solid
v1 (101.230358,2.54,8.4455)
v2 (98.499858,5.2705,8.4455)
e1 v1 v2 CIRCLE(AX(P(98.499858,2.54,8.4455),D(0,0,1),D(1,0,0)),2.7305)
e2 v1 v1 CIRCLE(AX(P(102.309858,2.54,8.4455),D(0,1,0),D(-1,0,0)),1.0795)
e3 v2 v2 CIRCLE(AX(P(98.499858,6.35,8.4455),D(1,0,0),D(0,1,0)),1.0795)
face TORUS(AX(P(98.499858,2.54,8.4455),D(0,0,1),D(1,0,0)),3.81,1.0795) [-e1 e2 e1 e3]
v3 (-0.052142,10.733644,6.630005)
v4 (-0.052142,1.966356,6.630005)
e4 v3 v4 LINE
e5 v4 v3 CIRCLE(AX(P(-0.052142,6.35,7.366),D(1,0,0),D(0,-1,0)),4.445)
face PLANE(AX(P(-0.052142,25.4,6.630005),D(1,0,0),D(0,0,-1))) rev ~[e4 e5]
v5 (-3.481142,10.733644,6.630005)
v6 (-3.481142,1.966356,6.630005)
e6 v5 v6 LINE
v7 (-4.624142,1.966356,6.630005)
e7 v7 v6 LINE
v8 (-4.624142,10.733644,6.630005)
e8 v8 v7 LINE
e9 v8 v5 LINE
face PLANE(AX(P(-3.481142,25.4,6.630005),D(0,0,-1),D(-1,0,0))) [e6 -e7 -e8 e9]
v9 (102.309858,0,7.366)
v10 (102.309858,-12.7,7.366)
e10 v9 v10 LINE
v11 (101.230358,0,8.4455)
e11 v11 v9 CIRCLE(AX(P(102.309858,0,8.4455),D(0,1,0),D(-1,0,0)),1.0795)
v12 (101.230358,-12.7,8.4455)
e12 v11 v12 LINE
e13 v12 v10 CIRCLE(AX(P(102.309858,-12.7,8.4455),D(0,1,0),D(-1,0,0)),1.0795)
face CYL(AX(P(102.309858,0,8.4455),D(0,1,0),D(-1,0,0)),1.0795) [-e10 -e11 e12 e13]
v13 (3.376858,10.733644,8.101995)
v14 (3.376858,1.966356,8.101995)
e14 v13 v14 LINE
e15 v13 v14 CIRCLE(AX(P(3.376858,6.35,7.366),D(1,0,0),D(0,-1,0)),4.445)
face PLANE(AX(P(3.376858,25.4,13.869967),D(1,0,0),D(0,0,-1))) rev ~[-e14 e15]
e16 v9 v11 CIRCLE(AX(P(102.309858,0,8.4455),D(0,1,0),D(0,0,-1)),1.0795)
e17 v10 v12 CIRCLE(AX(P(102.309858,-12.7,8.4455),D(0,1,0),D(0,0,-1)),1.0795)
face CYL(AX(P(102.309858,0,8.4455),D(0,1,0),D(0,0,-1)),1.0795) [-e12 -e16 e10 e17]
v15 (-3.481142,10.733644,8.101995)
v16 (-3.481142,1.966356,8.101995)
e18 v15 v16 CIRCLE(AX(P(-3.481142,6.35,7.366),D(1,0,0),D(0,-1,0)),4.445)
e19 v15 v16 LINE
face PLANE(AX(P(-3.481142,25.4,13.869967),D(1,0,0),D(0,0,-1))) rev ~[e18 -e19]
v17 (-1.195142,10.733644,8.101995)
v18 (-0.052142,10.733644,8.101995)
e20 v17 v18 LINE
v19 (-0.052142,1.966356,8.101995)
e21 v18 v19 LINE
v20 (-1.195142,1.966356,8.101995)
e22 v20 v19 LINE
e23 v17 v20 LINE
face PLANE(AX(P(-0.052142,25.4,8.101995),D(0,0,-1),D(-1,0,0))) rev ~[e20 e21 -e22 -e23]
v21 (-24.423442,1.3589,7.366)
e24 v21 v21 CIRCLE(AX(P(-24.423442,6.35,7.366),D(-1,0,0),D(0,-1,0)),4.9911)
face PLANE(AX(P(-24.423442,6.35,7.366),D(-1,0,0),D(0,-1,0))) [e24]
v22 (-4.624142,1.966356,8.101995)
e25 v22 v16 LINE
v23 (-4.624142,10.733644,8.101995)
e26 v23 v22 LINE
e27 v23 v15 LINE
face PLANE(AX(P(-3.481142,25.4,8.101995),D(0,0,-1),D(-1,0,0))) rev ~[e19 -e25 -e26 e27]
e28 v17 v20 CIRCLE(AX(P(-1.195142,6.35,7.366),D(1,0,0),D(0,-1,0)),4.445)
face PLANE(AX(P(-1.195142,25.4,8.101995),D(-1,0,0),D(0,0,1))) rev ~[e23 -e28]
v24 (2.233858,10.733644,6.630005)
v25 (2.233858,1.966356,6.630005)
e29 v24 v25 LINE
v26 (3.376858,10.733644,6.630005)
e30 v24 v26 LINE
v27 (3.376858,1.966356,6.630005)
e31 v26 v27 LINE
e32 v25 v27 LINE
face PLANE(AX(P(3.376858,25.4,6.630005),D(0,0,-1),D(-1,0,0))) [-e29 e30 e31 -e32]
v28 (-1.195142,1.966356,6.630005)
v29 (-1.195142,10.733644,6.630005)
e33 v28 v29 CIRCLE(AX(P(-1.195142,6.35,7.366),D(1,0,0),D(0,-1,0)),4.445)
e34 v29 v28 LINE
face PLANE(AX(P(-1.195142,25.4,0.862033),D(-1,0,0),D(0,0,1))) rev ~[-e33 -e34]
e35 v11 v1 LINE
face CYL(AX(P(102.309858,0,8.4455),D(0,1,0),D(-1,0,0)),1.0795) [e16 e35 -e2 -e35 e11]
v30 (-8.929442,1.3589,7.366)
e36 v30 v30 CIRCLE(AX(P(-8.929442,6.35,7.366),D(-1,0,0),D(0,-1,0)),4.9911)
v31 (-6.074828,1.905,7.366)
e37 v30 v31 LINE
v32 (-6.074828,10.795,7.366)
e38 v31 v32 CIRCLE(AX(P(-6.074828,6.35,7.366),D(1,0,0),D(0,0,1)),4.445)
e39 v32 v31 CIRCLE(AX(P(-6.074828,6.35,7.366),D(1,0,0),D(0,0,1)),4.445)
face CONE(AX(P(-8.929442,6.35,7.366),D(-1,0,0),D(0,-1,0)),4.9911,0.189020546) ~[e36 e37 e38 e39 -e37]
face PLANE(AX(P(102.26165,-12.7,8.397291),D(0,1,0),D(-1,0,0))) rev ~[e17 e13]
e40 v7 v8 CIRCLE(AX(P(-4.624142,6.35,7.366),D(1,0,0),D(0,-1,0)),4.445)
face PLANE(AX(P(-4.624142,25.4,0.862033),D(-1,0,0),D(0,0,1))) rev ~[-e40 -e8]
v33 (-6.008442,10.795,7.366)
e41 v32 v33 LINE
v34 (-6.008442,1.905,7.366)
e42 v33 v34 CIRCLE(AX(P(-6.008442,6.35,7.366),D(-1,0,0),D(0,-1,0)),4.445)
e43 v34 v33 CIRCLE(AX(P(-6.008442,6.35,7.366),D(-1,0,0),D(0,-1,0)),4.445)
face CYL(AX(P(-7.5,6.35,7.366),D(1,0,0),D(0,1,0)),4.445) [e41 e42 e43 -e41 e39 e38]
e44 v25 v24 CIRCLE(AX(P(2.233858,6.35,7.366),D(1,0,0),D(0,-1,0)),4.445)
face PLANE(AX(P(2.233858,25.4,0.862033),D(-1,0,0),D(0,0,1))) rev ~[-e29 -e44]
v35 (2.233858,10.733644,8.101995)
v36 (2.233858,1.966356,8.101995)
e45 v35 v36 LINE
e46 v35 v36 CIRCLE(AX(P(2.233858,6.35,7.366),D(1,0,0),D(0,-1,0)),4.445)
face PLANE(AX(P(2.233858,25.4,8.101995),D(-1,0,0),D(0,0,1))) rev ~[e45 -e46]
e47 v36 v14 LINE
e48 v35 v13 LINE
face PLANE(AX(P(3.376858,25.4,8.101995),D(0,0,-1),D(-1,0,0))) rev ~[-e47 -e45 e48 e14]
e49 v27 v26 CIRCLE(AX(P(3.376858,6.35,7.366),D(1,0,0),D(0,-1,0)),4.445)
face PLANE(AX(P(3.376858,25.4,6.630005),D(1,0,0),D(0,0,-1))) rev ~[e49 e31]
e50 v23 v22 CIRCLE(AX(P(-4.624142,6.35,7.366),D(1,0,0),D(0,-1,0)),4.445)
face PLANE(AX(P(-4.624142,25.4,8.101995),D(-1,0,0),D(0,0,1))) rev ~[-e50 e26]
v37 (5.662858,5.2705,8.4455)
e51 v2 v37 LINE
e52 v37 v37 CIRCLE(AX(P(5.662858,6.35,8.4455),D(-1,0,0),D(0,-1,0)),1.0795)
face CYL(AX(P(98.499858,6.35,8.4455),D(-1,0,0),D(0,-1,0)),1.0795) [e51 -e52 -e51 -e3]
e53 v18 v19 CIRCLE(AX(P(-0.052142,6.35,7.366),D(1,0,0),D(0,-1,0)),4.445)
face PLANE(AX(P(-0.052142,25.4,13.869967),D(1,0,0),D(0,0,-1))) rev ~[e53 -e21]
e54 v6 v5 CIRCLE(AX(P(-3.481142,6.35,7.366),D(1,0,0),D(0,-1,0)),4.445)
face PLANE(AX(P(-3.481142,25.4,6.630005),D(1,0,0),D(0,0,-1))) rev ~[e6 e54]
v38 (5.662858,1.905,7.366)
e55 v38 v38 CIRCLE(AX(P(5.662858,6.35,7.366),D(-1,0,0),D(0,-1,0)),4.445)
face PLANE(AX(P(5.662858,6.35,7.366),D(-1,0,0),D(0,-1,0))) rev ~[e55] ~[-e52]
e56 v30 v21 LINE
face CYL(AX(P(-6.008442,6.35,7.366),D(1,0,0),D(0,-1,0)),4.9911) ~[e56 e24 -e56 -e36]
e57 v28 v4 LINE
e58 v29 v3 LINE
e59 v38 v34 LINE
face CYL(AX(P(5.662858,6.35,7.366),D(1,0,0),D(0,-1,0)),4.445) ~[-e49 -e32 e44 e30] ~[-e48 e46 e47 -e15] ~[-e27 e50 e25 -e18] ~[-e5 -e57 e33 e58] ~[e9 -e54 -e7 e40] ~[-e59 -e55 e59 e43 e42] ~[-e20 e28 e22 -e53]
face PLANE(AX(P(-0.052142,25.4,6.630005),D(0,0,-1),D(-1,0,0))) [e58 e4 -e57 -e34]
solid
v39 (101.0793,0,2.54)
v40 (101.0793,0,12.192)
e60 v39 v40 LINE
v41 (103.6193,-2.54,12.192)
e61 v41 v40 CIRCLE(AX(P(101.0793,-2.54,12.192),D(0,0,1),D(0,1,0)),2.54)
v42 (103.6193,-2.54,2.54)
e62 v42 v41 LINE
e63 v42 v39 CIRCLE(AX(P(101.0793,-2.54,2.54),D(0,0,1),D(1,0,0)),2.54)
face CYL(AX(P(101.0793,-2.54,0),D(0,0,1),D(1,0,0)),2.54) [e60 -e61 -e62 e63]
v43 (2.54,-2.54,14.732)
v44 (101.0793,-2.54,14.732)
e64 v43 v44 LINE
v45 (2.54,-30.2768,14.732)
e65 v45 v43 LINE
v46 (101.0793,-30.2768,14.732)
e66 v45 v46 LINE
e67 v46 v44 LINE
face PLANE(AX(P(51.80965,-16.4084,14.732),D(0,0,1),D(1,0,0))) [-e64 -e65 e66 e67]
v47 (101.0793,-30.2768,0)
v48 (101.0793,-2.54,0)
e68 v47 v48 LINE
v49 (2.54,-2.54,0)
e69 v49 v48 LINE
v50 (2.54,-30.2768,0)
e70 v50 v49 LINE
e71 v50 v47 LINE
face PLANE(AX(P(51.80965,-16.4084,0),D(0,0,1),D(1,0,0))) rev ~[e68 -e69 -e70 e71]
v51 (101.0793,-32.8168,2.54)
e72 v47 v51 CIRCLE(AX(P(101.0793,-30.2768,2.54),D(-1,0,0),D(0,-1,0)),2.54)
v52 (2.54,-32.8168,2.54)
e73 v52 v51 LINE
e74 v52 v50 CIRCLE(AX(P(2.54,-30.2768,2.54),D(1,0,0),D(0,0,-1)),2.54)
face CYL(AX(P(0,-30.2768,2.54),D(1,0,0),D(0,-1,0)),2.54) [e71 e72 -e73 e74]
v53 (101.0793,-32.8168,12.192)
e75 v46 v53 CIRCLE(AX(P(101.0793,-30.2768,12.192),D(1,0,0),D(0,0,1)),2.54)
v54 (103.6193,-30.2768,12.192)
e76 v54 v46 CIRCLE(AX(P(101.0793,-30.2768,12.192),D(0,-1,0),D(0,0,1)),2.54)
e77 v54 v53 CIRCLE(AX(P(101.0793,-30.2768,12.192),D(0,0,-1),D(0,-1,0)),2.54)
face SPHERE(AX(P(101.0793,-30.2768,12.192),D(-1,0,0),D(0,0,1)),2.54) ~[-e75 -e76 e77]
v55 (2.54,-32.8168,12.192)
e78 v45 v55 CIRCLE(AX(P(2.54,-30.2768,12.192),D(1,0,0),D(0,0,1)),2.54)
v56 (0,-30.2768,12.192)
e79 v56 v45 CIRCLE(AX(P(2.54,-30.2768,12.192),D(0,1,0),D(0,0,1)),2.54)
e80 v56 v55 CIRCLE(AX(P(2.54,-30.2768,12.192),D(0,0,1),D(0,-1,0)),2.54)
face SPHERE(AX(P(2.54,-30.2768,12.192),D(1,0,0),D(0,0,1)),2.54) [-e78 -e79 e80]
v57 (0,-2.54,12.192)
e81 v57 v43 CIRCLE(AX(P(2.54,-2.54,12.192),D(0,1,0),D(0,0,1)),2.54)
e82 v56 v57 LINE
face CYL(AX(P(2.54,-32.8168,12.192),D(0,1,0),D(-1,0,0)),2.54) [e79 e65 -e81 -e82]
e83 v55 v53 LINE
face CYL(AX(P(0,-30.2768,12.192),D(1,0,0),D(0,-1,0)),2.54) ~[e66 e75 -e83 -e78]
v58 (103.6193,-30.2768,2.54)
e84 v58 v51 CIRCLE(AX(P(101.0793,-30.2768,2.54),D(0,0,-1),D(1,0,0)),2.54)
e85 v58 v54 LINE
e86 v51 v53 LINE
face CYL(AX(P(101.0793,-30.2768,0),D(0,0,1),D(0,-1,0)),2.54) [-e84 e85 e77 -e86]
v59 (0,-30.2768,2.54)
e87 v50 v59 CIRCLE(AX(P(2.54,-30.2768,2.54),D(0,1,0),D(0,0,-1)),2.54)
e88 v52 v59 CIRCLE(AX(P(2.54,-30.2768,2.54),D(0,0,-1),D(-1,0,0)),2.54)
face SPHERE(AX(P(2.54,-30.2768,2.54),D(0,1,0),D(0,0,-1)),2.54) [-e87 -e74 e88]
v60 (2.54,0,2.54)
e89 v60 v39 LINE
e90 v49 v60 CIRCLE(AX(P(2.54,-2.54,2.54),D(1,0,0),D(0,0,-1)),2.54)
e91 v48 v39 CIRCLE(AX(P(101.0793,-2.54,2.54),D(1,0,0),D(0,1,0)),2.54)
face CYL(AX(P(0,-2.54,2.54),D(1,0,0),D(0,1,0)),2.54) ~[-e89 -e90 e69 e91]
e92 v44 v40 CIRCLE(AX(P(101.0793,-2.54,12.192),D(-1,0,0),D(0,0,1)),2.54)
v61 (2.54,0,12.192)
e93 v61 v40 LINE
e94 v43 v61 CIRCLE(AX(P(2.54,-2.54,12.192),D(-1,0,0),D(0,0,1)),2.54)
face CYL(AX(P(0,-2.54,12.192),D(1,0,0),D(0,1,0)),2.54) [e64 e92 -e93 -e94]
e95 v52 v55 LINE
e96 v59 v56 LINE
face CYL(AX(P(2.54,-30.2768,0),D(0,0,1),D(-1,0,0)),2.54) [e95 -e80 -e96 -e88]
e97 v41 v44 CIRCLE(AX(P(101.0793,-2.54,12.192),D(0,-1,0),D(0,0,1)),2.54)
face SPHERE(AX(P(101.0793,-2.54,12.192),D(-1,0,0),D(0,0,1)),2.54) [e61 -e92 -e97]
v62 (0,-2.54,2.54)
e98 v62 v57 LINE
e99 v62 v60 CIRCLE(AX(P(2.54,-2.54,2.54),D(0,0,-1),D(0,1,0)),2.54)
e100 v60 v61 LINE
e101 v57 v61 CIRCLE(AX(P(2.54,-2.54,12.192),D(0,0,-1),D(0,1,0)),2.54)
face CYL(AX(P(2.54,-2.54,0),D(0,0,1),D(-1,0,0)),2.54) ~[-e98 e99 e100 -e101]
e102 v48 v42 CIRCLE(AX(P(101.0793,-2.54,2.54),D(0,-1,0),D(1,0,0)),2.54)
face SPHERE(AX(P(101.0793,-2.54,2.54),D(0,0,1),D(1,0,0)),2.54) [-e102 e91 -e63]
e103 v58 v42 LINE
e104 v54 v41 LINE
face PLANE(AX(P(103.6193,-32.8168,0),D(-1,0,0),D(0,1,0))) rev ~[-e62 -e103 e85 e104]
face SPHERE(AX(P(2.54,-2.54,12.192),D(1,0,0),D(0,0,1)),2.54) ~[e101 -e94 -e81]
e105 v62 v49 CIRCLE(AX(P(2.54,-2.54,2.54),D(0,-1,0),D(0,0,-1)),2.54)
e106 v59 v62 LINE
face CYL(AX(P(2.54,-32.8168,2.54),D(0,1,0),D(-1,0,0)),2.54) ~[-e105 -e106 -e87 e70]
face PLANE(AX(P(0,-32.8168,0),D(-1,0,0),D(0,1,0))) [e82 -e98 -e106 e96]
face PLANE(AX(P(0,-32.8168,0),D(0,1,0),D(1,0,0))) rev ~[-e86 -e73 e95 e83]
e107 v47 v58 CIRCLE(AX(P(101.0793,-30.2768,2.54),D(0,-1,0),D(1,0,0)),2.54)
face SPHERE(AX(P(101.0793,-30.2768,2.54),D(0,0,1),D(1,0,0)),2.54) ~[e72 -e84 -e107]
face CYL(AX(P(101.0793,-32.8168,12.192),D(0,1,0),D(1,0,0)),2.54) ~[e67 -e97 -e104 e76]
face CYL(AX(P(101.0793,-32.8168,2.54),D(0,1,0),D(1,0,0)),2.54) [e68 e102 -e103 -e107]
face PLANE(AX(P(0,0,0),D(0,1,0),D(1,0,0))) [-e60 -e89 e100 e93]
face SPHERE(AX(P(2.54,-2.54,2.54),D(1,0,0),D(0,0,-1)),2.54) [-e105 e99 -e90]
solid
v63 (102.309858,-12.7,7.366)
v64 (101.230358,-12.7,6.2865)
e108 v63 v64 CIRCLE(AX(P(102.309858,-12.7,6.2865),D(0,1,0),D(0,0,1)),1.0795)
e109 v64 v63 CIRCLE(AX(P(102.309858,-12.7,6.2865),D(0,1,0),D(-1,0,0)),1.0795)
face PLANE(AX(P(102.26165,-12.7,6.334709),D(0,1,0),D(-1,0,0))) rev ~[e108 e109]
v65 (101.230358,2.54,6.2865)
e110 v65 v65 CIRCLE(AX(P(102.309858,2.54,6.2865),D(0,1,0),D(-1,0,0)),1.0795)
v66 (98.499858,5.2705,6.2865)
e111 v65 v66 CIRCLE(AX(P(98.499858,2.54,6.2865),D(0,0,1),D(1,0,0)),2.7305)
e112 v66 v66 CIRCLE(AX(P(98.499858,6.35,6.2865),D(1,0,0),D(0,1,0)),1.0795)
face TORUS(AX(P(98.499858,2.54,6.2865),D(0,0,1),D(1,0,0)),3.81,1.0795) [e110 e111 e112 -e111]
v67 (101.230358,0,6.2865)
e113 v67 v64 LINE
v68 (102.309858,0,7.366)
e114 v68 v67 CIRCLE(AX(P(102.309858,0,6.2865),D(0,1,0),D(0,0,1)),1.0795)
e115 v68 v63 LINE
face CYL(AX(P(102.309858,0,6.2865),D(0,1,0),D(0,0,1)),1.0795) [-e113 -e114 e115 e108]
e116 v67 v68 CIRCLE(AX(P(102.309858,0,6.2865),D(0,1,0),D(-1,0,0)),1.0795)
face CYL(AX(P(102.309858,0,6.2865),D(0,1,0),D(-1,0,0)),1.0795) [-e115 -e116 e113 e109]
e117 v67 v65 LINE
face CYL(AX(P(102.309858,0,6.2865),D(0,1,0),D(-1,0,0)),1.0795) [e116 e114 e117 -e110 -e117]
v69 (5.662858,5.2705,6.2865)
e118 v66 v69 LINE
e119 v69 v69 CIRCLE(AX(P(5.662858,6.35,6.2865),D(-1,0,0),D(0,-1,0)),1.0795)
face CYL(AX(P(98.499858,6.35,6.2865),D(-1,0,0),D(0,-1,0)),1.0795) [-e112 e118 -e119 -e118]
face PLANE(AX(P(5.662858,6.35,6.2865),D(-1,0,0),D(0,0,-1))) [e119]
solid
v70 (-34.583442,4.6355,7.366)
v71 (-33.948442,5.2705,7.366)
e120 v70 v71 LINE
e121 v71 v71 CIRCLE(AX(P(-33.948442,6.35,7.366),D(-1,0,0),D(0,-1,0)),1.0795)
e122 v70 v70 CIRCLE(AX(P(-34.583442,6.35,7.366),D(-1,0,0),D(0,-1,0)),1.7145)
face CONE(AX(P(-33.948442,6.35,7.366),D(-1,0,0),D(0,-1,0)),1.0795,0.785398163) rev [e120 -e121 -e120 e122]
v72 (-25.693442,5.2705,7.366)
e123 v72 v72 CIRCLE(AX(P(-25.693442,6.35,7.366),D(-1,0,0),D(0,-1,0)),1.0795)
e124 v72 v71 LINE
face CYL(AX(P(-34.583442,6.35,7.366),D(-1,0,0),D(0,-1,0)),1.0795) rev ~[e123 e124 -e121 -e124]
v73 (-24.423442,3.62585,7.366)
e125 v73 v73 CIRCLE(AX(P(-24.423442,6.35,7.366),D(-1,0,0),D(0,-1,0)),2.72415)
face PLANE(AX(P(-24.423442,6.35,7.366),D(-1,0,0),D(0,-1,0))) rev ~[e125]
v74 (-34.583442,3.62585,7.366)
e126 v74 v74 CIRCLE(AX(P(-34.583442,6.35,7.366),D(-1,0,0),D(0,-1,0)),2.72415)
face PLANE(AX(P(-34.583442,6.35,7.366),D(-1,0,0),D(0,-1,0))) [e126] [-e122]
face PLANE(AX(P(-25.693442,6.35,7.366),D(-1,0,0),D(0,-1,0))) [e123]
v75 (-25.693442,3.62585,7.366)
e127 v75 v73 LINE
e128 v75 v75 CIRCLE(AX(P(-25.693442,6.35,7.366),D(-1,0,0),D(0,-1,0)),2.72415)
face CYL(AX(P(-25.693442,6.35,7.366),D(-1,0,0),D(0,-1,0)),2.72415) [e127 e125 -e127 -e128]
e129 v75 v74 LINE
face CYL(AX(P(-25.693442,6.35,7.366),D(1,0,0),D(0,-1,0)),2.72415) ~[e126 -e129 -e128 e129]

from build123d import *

# Parameters (mm, degrees)
F0_W         = 103.6193
F0_H         = 32.8168
F1_DEPTH     = 14.732
F2_R         = 2.54
F4_DEPTH     = 12.7
F4_FACE_R    = 1.0795
F12_R        = 4.445
F13_DEPTH    = 11.6713
F11_R        = 1.0795
F15_W        = 1.143
F15_H        = 2.0589674757
F15_H_2      = 3.7090053149
F16_DEPTH    = 24.13
F17_R        = 4.9911
F17_R_2      = 4.445
F18_DEPTH    = 18.415
F19_S5_R     = 4.445
F19_T6_DEPTH = 9
F21_R        = 2.72415
F22_DEPTH    = 1.27
F23_DEPTH    = 8.89
F24_R        = 1.0795
F25_DEPTH    = 8.89
F26_SIZE     = 0.635


# Not quite as in the source:
# - a fillet or chamfer that OpenCascade refuses, or shapes differently, is made with other operations: its cross-section is extruded or revolved along the edge and cut away or added


with BuildPart() as f1:
    # F0 (on Top) → F1 (new body)
    with BuildSketch(Plane.XY):
        with Locations((51.80965, -16.4084)):
            Rectangle(F0_W, F0_H)
    extrude(amount=F1_DEPTH)

    # F2
    f2_edges = [f1.edges().sort_by_distance(p)[0] for p in [
        (51.80965, -32.8168, 14.732),
        (51.80965, 0, 14.732),
        (0, -16.4084, 14.732),
        (103.6193, -16.4084, 14.732),
        (103.6193, -32.8168, 7.366),
        (103.6193, 0, 7.366),
        (103.6193, -16.4084, 0),
        (51.80965, 0, 0),
        (0, -16.4084, 0),
        (51.80965, -32.8168, 0),
        (0, 0, 7.366),
        (0, -32.8168, 7.366),
    ]]
    fillet(f2_edges, radius=F2_R)


with BuildPart() as f4:
    # F3 (on face) → F4 (new body)
    with BuildSketch(Plane(origin=(0, 0, 0), x_dir=(-1, 0, 0), z_dir=(0, 1, 0))):
        with BuildLine():
            ThreePointArc((-102.3098584272, 7.366), (-103.0731801975, 5.5231782297), (-101.2303584272, 6.2865))
            ThreePointArc((-101.2303584272, 6.2865), (-101.546536657, 7.0498217703), (-102.3098584272, 7.366))
        make_face()
    extrude(amount=-F4_DEPTH)

    # F9: sweep along a path in F7
    with BuildLine(Plane(origin=(0, 0, 6.2484), x_dir=(1, 0, 0), z_dir=(0, 0, -1))) as f9_path:
        Line((102.3098584272, 0), (102.3098584272, -2.54))
        ThreePointArc((102.3098584272, -2.54), (101.1939352636, -5.2340768363), (98.4998584272, -6.35))
        Line((98.4998584272, -6.35), (5.6628584272, -6.35))
    # F4_face (on face) → F9 (sweep)
    with BuildSketch(Plane(origin=(102.3098584272, 0, 6.2865), x_dir=(-1, 0, 0), z_dir=(0, 1, 0))):
        Circle(F4_FACE_R)
    sweep(path=f9_path.line)


with BuildPart() as f4b:
    # F3 (on face) → F4, piece 2 (new body)
    with BuildSketch(Plane(origin=(0, 0, 0), x_dir=(-1, 0, 0), z_dir=(0, 1, 0))):
        with BuildLine():
            ThreePointArc((-101.2303584272, 8.4455), (-103.0731801975, 9.2088217703), (-102.3098584272, 7.366))
            ThreePointArc((-102.3098584272, 7.366), (-101.546536657, 7.6821782297), (-101.2303584272, 8.4455))
        make_face()
    extrude(amount=-F4_DEPTH)

    # F10: sweep along a path in F8
    with BuildLine(Plane(origin=(0, 0, 8.4328), x_dir=(1, 0, 0), z_dir=(0, 0, -1))) as f10_path:
        Line((102.3098584272, 0), (102.3098584272, -2.54))
        ThreePointArc((102.3098584272, -2.54), (101.1939352636, -5.2340768363), (98.4998584272, -6.35))
        Line((98.4998584272, -6.35), (5.6628584272, -6.35))
    # F4_face (on face) → F10 (sweep)
    with BuildSketch(Plane(origin=(102.3098584272, 0, 6.2865), x_dir=(-1, 0, 0), z_dir=(0, 1, 0))):
        with Locations((0, 2.159)):
            Circle(F4_FACE_R)
    sweep(path=f10_path.line)

    # F12 (on face) → F13 (join)
    with BuildSketch(Plane(origin=(5.6628584272, 0, 0), x_dir=(0, -1, 0), z_dir=(-1, 0, 0))):
        with Locations((-6.35, 7.366)):
            Circle(F12_R)
        with BuildLine():
            ThreePointArc((-6.35, 7.366), (-5.5866782297, 7.0498217703), (-5.2705, 6.2865))
            ThreePointArc((-5.2705, 6.2865), (-7.1133217703, 5.5231782297), (-6.35, 7.366))
        make_face(mode=Mode.SUBTRACT)
        with BuildLine():
            ThreePointArc((-5.2705, 8.4455), (-5.5866782297, 7.6821782297), (-6.35, 7.366))
            ThreePointArc((-6.35, 7.366), (-7.1133217703, 9.2088217703), (-5.2705, 8.4455))
        make_face(mode=Mode.SUBTRACT)
        with BuildLine():
            ThreePointArc((-6.35, 7.366), (-7.1133217703, 5.5231782297), (-5.2705, 6.2865))
            ThreePointArc((-5.2705, 6.2865), (-5.5866782297, 7.0498217703), (-6.35, 7.366))
        make_face()
    extrude(amount=F13_DEPTH)

    # F11 (on face) → F13, piece 2 (join)
    with BuildSketch(Plane(origin=(5.6628584272, 0, 0), x_dir=(0, -1, 0), z_dir=(-1, 0, 0))):
        with Locations((-6.35, 8.4455)):
            Circle(F11_R)
    extrude(amount=F13_DEPTH)

    # F15 (on offset) → F16 (cut)
    with BuildSketch(Plane(origin=(0, 25.4, 0), x_dir=(-1, 0, 0), z_dir=(0, 1, 0))):
        with Locations((4.0526415728, 1.8915162622)):
            Rectangle(F15_W, F15_H)
        with Locations((4.0526415728, 4.7755026575)):
            Rectangle(F15_W, F15_H_2)
        with Locations((0.6236415728, 1.8915162622)):
            Rectangle(F15_W, F15_H)
        with Locations((0.6236415728, 4.7755026575)):
            Rectangle(F15_W, F15_H_2)
        with Locations((-2.8053584272, 1.8915162622)):
            Rectangle(F15_W, F15_H)
        with Locations((-2.8053584272, 4.7755026575)):
            Rectangle(F15_W, F15_H_2)
        with Locations((-2.8053584272, 9.9564973425)):
            Rectangle(F15_W, F15_H_2)
        with Locations((0.6236415728, 9.9564973425)):
            Rectangle(F15_W, F15_H_2)
        with Locations((-2.8053584272, 12.8404837378)):
            Rectangle(F15_W, F15_H)
        with Locations((0.6236415728, 12.8404837378)):
            Rectangle(F15_W, F15_H)
        with Locations((4.0526415728, 12.8404837378)):
            Rectangle(F15_W, F15_H)
        with Locations((4.0526415728, 9.9564973425)):
            Rectangle(F15_W, F15_H_2)
    extrude(amount=-F16_DEPTH, mode=Mode.SUBTRACT)

    # F17 (on face) → F18 (join)
    with BuildSketch(Plane(origin=(-6.0084415728, 0, 0), x_dir=(0, -1, 0), z_dir=(-1, 0, 0))):
        with Locations((-6.35, 7.366)):
            Circle(F17_R)
        with Locations((-6.35, 7.366)):
            Circle(F17_R_2, mode=Mode.SUBTRACT)
        with Locations((-6.35, 7.366)):
            Circle(F17_R_2)
    extrude(amount=F18_DEPTH)

    # F19: chamfer of 2.921 x 0.5588 on 1 edges, made by hand


with BuildPart() as f19_tool2:
    # F19_s3 → F19_t4 (revolve)
    with BuildSketch(Plane.XY.offset(7.366)):
        Polygon((-8.9294415728, 1.3589), (-6.0084415728, 1.9177), (-6.0084415728, 1.3589), align=None)
    revolve(axis=Axis((-6.0084415728, 6.35, 7.366), (-1, 0, 0)))

    # F19_s5 → F19_t6 (cut, symmetric)
    with BuildSketch(Plane.YZ.offset(-7.5)):
        with Locations((6.35, 7.366)):
            Circle(F19_S5_R)
    extrude(amount=F19_T6_DEPTH, both=True, mode=Mode.SUBTRACT)


with BuildPart() as f4b_1:
    add(f4b.part)

    # F19_t1: cut F19_tool2
    add(f19_tool2.part, mode=Mode.SUBTRACT)


with BuildPart() as f22:
    # F21 (on offset) → F22 (new body, through all)
    with BuildSketch(Plane(origin=(-25.6934415728, 0, 0), x_dir=(0, -1, 0), z_dir=(-1, 0, 0))):
        with Locations((-6.35, 7.366)):
            Circle(F21_R)
    extrude(amount=-F22_DEPTH)

    # F23 (add): a face of the model
    f23_faces = [f22.faces().sort_by_distance(p)[0] for p in [
        (-25.6934415728, 6.35, 7.366),
    ]]
    extrude(f23_faces, amount=F23_DEPTH)

    # F24 (on face) → F25 (cut, symmetric)
    with BuildSketch(Plane(origin=(-34.5834415728, 0, 0), x_dir=(0, -1, 0), z_dir=(-1, 0, 0))):
        with Locations((-6.35, 7.366)):
            Circle(F24_R)
    extrude(amount=F25_DEPTH, both=True, mode=Mode.SUBTRACT)

    # F26
    f26_edges = [f22.edges().sort_by_distance(p)[0] for p in [
        (-34.583442, 7.4295, 7.366),
    ]]
    chamfer(f26_edges, length=F26_SIZE)


solid = Compound([f1.part, f4.part, f4b_1.part, f22.part])
